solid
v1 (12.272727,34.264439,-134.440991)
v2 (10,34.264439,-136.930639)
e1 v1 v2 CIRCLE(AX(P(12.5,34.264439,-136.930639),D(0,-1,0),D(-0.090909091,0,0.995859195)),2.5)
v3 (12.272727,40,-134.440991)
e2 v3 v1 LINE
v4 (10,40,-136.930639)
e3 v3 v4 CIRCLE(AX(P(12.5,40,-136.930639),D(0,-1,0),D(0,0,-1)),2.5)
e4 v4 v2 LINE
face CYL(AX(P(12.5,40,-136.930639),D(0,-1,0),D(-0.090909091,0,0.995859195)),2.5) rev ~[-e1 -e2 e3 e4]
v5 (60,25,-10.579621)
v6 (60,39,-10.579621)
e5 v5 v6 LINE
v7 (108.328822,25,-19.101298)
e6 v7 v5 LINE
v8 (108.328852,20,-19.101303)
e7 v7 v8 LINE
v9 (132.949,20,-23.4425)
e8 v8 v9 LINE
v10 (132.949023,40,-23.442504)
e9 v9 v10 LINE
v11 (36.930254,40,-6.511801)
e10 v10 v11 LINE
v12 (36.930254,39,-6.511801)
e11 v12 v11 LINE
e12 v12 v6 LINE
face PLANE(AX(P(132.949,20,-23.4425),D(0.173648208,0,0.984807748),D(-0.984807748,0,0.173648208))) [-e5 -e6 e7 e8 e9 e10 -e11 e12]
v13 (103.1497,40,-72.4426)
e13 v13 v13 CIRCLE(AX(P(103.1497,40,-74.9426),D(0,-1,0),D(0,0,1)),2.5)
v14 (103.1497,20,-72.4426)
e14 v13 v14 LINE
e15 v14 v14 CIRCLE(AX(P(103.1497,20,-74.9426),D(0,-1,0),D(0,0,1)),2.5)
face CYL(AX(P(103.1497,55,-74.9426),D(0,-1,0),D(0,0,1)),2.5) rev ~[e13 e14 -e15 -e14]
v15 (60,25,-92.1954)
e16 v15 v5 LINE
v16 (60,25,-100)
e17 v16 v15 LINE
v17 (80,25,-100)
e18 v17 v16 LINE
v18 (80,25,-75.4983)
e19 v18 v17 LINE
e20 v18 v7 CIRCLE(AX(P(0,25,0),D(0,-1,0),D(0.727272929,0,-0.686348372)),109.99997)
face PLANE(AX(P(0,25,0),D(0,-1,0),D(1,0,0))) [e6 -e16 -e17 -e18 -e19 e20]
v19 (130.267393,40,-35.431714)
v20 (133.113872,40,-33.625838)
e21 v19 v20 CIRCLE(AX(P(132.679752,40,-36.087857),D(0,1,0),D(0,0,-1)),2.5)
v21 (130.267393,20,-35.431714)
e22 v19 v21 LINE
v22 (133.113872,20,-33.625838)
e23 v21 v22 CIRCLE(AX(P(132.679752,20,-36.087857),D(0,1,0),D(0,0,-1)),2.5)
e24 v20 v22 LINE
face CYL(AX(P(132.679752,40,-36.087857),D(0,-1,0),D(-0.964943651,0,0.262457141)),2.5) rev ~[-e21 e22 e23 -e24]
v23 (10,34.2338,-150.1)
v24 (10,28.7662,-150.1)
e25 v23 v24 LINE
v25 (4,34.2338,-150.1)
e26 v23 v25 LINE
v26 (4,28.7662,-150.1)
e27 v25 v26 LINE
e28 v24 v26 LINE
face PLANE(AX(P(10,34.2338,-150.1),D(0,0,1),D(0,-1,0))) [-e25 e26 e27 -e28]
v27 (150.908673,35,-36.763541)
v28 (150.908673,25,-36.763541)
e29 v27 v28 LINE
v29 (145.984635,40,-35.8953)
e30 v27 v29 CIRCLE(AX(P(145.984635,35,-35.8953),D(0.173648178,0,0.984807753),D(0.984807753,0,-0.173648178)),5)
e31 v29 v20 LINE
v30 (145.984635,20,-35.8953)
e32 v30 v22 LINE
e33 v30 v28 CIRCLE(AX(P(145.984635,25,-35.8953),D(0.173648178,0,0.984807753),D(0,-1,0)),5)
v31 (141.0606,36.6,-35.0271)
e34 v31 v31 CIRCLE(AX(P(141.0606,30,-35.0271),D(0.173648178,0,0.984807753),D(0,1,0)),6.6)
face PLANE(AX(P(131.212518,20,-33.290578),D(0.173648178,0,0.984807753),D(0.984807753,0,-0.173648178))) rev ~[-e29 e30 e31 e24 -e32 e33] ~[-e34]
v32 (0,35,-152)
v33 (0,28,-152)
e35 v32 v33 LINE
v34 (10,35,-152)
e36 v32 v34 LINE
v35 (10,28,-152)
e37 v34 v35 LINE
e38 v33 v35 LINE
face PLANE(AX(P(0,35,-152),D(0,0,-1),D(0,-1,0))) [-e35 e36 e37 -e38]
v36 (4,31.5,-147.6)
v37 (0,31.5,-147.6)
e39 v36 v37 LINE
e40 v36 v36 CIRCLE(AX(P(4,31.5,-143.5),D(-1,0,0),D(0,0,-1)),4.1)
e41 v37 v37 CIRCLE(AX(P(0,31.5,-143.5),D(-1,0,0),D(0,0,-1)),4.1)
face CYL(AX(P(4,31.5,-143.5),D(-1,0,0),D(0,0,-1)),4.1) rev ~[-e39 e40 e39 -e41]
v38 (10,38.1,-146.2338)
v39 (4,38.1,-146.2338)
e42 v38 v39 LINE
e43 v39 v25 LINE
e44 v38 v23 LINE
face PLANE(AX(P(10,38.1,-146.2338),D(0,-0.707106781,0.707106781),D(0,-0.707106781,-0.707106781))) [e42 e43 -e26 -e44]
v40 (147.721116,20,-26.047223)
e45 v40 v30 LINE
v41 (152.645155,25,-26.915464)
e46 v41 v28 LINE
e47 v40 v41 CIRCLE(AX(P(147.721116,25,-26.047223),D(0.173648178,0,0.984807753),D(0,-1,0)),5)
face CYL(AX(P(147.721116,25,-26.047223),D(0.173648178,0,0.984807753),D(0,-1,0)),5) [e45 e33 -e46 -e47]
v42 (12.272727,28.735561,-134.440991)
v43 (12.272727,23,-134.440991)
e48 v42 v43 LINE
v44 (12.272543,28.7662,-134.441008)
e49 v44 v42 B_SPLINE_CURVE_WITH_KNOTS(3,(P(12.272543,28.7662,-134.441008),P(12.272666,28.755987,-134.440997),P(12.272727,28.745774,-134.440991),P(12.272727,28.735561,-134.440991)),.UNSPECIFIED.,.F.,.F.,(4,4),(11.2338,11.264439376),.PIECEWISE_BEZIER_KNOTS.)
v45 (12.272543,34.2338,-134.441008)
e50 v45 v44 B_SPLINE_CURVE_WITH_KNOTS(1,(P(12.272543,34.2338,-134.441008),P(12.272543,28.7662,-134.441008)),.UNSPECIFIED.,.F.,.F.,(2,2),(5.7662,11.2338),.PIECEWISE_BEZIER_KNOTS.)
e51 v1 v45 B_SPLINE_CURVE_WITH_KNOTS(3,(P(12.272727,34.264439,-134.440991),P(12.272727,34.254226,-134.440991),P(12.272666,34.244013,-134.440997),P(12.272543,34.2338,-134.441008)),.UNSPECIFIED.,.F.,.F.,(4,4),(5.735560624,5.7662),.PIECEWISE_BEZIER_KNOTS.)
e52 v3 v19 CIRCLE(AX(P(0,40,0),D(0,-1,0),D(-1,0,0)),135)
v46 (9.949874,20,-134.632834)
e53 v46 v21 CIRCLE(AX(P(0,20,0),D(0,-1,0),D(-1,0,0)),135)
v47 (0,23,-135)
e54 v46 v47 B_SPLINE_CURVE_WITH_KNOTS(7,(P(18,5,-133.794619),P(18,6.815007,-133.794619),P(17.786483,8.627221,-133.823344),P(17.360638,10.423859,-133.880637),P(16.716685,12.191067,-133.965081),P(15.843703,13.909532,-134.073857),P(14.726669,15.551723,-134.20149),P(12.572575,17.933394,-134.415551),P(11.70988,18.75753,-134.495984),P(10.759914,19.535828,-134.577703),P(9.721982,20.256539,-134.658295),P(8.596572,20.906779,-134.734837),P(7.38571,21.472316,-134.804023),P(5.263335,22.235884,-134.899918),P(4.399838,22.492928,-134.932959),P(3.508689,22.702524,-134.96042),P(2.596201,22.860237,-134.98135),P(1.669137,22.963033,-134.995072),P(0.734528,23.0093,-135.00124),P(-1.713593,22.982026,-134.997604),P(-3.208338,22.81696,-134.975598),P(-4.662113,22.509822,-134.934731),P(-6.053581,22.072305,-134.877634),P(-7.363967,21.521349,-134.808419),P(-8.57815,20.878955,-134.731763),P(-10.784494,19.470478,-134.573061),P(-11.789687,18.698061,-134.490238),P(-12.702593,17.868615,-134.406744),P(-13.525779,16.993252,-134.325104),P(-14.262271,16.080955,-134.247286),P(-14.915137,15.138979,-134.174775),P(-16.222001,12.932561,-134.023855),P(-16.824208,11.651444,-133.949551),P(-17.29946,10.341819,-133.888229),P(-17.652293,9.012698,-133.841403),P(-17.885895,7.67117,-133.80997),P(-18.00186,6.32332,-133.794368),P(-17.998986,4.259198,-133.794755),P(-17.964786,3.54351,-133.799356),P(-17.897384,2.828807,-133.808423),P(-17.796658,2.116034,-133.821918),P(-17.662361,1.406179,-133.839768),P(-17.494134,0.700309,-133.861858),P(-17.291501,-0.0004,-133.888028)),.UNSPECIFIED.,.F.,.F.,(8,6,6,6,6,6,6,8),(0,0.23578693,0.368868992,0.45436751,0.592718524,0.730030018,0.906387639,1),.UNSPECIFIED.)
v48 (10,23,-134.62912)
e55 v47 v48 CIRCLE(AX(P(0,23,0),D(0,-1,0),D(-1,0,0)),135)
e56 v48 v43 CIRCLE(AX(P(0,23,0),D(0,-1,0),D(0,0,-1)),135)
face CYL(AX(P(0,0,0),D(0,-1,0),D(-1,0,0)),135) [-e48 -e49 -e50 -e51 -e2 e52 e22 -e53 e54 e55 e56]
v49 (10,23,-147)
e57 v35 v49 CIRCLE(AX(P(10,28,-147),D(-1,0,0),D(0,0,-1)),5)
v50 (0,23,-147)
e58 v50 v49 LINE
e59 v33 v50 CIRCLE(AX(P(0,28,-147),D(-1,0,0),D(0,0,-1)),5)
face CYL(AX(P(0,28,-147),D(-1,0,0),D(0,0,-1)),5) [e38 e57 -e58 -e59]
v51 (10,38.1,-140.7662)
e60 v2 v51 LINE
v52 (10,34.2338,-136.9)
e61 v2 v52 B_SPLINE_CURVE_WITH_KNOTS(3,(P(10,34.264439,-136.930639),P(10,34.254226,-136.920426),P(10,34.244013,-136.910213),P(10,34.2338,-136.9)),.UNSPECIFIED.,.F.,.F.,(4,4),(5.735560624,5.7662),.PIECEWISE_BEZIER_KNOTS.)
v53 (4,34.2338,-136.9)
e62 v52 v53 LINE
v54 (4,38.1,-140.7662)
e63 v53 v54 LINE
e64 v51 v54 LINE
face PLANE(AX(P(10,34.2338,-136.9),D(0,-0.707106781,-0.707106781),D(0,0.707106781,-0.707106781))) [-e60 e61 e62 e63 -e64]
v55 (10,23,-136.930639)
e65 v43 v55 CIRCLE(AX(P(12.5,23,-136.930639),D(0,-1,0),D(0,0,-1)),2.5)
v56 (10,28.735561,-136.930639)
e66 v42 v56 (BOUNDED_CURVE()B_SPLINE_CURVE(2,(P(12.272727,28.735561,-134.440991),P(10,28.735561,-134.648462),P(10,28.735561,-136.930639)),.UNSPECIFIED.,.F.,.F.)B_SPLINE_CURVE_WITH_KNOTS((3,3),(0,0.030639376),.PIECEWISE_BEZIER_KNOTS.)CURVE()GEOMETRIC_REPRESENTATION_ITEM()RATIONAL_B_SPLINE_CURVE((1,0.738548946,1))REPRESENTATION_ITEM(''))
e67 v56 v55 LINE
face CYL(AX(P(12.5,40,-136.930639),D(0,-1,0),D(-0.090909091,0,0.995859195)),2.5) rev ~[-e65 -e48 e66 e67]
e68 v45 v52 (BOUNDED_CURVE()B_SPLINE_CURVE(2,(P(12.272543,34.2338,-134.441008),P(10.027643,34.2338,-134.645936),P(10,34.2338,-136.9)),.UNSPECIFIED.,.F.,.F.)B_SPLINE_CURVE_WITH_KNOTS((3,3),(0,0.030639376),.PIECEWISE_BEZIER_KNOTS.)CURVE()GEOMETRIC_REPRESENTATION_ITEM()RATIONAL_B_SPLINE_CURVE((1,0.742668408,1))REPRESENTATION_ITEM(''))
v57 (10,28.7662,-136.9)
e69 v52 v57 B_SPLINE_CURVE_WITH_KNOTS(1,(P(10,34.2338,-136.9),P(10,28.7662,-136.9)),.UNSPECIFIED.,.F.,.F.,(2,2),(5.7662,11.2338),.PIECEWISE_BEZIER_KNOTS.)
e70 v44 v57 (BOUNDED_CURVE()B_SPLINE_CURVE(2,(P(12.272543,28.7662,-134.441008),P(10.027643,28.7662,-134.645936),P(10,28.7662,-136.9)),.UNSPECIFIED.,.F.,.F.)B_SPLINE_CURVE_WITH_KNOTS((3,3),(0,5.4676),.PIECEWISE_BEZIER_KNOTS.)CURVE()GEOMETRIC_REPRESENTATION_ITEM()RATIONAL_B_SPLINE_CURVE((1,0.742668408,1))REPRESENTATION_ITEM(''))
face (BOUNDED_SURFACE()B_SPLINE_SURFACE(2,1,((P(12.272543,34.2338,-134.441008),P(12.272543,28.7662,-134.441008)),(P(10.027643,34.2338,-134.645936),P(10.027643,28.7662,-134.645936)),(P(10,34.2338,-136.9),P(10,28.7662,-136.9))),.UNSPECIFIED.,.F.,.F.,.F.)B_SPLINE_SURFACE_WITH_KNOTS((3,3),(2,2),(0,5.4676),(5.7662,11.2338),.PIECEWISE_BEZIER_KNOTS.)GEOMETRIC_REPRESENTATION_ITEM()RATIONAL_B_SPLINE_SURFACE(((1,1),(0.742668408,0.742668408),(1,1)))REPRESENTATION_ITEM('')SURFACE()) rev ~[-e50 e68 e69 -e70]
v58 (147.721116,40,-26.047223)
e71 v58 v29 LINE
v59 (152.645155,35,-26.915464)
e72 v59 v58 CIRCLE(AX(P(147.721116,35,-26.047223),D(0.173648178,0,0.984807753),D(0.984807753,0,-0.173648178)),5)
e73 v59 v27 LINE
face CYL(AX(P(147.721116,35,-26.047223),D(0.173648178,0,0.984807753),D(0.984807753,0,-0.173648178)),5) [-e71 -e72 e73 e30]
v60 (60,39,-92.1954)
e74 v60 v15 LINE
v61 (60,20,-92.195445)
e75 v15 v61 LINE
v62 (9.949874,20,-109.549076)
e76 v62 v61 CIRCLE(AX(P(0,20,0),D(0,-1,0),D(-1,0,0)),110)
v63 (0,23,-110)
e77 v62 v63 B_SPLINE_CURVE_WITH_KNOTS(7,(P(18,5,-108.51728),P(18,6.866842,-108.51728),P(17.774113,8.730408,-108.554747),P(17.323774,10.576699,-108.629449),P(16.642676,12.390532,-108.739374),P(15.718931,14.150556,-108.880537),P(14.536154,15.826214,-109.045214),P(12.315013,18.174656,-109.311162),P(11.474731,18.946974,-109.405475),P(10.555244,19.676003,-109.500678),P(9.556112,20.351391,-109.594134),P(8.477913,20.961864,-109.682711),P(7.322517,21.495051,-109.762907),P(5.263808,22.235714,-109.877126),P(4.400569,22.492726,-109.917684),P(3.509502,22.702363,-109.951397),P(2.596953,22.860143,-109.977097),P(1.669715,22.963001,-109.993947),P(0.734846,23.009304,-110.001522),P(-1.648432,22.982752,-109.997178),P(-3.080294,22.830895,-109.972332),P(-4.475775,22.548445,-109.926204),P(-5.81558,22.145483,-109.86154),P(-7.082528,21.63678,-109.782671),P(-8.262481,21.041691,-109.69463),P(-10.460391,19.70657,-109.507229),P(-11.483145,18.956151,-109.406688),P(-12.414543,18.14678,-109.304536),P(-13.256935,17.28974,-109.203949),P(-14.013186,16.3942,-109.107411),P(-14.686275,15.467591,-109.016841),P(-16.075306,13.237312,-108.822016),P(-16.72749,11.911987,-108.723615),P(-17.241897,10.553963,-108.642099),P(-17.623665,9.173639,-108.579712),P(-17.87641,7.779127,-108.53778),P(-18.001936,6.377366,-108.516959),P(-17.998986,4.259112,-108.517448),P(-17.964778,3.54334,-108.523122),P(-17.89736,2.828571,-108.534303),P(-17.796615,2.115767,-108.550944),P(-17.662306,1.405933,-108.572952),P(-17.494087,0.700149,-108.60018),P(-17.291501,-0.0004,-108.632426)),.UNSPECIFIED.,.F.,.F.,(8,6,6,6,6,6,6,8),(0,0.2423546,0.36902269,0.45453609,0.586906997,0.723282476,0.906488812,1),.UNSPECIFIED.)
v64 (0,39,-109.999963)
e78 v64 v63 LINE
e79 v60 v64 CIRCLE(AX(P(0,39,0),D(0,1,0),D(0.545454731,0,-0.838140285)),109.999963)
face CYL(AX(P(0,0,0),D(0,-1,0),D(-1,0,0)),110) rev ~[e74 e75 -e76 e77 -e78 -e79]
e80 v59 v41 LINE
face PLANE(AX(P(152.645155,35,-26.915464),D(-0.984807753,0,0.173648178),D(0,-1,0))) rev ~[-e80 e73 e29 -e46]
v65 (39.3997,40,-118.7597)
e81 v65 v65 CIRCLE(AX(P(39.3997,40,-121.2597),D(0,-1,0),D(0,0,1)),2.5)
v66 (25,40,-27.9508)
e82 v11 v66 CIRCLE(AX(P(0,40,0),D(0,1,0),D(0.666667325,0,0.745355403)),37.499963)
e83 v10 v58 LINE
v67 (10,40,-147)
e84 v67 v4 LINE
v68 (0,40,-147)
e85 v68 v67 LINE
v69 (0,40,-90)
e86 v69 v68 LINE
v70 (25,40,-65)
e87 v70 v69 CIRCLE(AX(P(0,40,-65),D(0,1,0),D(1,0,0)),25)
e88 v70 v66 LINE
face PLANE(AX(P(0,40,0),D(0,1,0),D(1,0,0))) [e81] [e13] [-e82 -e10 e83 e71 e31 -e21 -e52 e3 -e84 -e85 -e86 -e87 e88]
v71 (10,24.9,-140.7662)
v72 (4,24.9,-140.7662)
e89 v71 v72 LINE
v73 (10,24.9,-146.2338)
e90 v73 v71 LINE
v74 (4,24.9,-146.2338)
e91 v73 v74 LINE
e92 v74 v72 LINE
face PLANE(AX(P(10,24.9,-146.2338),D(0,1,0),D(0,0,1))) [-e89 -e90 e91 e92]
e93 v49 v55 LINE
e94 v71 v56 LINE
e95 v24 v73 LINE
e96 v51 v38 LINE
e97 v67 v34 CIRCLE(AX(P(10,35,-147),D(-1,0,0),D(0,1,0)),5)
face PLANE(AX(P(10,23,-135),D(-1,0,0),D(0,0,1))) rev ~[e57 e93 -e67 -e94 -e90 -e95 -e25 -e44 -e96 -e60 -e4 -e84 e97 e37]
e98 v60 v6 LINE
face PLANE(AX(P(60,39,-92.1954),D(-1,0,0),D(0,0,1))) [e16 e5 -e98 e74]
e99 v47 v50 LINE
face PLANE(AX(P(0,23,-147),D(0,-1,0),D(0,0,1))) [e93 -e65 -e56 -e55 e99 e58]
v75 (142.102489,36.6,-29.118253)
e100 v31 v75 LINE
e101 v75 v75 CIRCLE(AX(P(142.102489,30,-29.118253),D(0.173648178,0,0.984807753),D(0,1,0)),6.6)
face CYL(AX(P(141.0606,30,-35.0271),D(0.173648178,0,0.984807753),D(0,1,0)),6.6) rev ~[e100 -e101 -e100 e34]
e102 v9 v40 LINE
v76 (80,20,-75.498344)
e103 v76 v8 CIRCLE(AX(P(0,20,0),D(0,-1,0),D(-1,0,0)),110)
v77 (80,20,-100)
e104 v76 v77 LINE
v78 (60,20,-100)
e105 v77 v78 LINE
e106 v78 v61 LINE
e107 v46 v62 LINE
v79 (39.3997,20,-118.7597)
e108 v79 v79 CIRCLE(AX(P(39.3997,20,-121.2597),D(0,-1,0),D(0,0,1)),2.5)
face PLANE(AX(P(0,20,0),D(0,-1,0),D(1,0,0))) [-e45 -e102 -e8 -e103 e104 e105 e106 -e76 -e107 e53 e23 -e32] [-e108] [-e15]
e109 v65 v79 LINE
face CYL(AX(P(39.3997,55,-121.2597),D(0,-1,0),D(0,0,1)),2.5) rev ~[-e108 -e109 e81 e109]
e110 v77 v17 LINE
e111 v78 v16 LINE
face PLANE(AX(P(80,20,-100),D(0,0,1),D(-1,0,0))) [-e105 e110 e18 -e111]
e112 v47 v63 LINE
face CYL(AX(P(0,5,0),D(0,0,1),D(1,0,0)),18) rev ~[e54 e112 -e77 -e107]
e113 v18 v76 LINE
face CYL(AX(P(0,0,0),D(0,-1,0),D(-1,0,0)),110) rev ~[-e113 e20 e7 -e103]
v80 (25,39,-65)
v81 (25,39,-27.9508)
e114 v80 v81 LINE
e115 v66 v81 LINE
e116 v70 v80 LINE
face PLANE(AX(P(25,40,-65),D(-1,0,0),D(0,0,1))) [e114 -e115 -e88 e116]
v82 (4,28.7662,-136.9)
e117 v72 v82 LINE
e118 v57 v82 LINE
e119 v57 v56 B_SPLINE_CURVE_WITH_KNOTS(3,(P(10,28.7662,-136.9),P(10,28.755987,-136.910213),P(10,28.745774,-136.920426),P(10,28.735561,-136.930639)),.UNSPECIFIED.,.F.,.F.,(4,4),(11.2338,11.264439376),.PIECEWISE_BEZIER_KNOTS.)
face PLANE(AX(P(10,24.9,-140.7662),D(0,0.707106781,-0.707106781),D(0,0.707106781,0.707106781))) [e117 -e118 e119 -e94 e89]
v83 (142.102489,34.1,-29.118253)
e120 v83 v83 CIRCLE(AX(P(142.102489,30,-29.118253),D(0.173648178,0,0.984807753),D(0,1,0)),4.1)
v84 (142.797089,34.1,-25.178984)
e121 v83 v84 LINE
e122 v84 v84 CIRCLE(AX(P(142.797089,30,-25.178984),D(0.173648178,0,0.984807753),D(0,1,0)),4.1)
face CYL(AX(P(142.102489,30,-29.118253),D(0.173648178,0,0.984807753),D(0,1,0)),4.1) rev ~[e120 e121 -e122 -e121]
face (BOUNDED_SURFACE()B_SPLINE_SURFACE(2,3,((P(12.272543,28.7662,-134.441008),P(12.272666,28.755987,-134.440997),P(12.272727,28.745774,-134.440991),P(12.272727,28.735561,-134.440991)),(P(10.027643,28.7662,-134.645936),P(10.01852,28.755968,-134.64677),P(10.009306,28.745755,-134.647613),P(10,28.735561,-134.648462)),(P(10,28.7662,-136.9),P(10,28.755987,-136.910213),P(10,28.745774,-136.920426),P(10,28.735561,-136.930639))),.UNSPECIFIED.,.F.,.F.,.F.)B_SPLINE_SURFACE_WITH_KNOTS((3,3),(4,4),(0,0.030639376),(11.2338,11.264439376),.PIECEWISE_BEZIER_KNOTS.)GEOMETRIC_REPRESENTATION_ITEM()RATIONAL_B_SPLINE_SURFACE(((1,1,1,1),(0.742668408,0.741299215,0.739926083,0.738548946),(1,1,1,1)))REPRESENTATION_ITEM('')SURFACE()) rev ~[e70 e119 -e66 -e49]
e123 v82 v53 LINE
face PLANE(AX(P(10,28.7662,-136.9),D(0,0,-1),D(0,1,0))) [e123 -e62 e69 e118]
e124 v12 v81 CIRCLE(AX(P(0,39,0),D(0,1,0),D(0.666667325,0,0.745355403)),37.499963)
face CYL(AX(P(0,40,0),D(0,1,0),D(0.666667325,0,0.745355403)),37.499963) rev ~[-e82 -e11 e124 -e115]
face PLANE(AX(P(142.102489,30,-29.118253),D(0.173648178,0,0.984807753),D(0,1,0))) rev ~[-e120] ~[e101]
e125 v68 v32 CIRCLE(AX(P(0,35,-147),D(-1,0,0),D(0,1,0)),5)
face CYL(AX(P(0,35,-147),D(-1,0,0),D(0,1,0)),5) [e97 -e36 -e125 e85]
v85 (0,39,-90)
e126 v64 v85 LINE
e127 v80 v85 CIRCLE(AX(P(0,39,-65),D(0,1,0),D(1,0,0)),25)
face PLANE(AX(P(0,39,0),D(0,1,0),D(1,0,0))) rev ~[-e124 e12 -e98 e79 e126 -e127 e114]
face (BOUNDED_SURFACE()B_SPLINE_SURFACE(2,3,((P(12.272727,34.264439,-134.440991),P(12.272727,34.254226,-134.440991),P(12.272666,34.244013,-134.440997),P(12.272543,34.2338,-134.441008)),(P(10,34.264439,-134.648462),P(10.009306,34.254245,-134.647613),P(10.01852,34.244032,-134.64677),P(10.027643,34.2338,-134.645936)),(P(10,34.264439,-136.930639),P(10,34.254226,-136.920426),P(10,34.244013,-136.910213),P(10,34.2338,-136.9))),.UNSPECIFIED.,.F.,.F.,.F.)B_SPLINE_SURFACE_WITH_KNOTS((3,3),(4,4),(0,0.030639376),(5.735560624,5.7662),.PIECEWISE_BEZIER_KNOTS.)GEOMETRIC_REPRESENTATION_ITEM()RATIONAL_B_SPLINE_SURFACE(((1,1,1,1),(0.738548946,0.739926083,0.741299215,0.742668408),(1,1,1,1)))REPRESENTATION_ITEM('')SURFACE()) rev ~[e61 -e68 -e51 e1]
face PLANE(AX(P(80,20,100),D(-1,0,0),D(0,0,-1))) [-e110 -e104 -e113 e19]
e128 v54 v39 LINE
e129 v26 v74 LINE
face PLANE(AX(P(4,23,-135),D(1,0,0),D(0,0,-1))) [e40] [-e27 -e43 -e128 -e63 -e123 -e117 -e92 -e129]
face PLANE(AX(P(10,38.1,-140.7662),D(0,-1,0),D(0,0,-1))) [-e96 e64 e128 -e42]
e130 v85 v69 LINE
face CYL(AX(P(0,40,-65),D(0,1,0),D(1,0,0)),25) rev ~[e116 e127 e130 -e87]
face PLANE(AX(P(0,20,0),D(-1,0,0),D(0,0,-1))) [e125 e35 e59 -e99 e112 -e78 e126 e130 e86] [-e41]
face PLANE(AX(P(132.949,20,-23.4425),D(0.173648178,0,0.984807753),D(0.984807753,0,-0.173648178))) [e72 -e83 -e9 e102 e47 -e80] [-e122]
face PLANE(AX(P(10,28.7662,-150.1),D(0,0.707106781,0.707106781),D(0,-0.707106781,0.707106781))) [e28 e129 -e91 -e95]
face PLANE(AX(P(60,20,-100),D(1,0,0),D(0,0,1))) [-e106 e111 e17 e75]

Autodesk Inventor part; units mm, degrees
ref_plane "YZ Plane" through (0, 0, 0) normal (1, 0, 0) x (0, 1, 0)
ref_plane "XZ Plane" through (0, 0, 0) normal (0, 1, 0) x (-1, 0, 0)
ref_plane "XY Plane" through (0, 0, 0) normal (0, 0, 1) x (1, 0, 0)
sketch "Sketch1" plane through (0, 0, 0) normal (0, 1, 0) x (-1, 0, 0)
  circle A0 centre (0, 0) radius 135
  circle A1 centre (0, 0) radius 110
  dimension "d0" = 270
  dimension "d1" = 220
extrude "Extrusion1" add sketch "Sketch1" along normal blind 55
sketch "Sketch2" plane through (0, 0, 0) normal (0, 0, 1) x (1, 0, 0)
  circle A0 centre (0, 5) radius 18
  line L0 (135, 0) -> (-135, 0) projected
  point P0 (0, 0)
  dimension "d4" = 36
  dimension "d5" = 5
extrude "Extrusion2" cut sketch "Sketch2" against normal through all
sketch "Sketch3" plane through (0, 0, 0) normal (0, -1, 0) x (1, 0, 0)
  circle A0 centre (0, 0) radius 140
extrude "Extrusion3" cut sketch "Sketch3" against normal blind 20
sketch "Sketch4" plane through (0, 20, 0) normal (0, -1, 0) x (1, 0, 0)
  line L0 (0, 0) -> (70, 0)
  line L1 (80, -100) -> (60, -100)
  line L2 (60, -100) -> (60, 100)
  line L3 (60, 100) -> (80, 100)
  line L4 (80, 100) -> (80, -100)
  line L5 (80, -100) -> (60, 100) construction
  line L6 (60, -100) -> (80, 100) construction
  dimension "d10" = 70
  dimension "d11" = 20
  dimension "d12" = 200
extrude "Extrusion4" cut sketch "Sketch4" against normal through all
sketch "Sketch5" plane through (0, 55, 0) normal (0, 1, 0) x (1, 0, 0)
  circle A0 centre (0, 0) radius 127.5
  circle A1 centre (127.5, 0) radius 2
  circle A2 centre (103.1497, 74.9426) radius 2
  circle A3 centre (39.3997, 121.2597) radius 2
  circle A4 centre (-39.3997, 121.2597) radius 2
  circle A5 centre (-103.1497, 74.9426) radius 2
  circle A6 centre (-127.5, 0) radius 2
  circle A7 centre (-103.1497, -74.9426) radius 2
  circle A8 centre (-39.3997, -121.2597) radius 2
  circle A9 centre (39.3997, -121.2597) radius 2
  circle A10 centre (103.1497, -74.9426) radius 2
  dimension "d15" = 255
  dimension "d16" = 4
  dimension "d19" = 360
hole "Hole1" at (127.5, 55, 0) at (103.1497, 55, 74.9426) at (39.3997, 55, 121.2597) at (-39.3997, 55, 121.2597) at (-103.1497, 55, 74.9426) at (-127.5, 55, 0) at (-103.1497, 55, -74.9426) at (-39.3997, 55, -121.2597) at (39.3997, 55, -121.2597) at (103.1497, 55, -74.9426) direction (0, -1, 0) diameter 5 end through all
sketch "Sketch6" plane through (0, 55, 0) normal (0, 1, 0) x (1, 0, 0)
  circle A0 centre (0, 0) radius 140
extrude "Extrusion5" cut sketch "Sketch6" against normal blind 15
sketch "Sketch7" plane through (0, 40, 0) normal (0, 1, 0) x (1, 0, 0)
  circle A0 centre (0, 0) radius 140
  line L0 (80, -100) -> (80, -75.4983) projected
  line L1 (80, -100) -> (80, -75.4983)
  line L2 (60, -100) -> (80, -100) projected
  line L3 (80, -100) -> (60, -100)
  line L4 (60, -100) -> (60, -92.1954)
  line L5 (60, 100) -> (60, 92.1954) projected
  line L6 (60, 92.1954) -> (60, 100)
  line L7 (60, 100) -> (80, 100)
  line L8 (80, 100) -> (80, 75.4983)
  arc A1 (80, -75.4983) -> (80, 75.4983) centre (0, 0) ccw
  arc A2 (60, 92.1954) -> (60, -92.1954) centre (0, 0) ccw
  arc A3 (-25, -65) -> (25, -65) centre (0, -65) ccw
  arc A4 (25, 65) -> (-25, 65) centre (0, 65) ccw
  arc A5 (25, -27.9508) -> (25, 27.9508) centre (0, 0) ccw
  arc A6 (-25, 27.9508) -> (-25, -27.9508) centre (0, 0) ccw
  line L9 (25, 65) -> (25, 27.9508)
  line L10 (25, -27.9508) -> (25, -65)
  line L11 (-25, -65) -> (-25, -27.9508)
  line L12 (-25, 27.9508) -> (-25, 65)
extrude "Extrusion6" add sketch "Sketch7" against normal blind 1 contours L2 L4 A2 L5 L7 L8 A1 L0
sketch "Sketch8" plane through (0, 39, 0) normal (0, -1, 0) x (1, 0, 0)
  line L0 (80, -75.4983) -> (80, -100) projected
  line L1 (80, -100) -> (60, -100)
  line L2 (60, -100) -> (60, 100)
  line L3 (60, 100) -> (80, 100)
  line L4 (80, 100) -> (80, 75.4983)
  line L5 (80, -75.4983) -> (80, -100)
  arc A0 (80, -75.4983) -> (80, 75.4983) centre (0, 0) ccw
  arc A1 (60, 92.1954) -> (60, -92.1954) centre (0, 0) ccw
extrude "Extrusion7" add sketch "Sketch8" along normal blind 14 contours L0 L1 L2 L3 L4 A0
sketch "Sketch9" plane through (0, 20, 0) normal (0, -1, 0) x (1, 0, 0)
  arc A0 (9.9499, -134.6328) -> (-9.9499, -134.6328) centre (0, 0) ccw projected
  spline S0 degree 7 poles (9.9499, -134.6328) (9.4556, -134.6694) (8.9421, -134.7052) (8.4096, -134.74) (7.8582, -134.7735) (7.2882, -134.8052) (6.6998, -134.835) (5.2633, -134.8999) (4.3998, -134.933) (3.5087, -134.9604) (2.5962, -134.9814) (1.6691, -134.9951) (0.7345, -135.0012) (-1.7136, -134.9976) (-3.2083, -134.9756) (-4.6621, -134.9347) (-6.0536, -134.8776) (-7.364, -134.8084) (-8.5782, -134.7318) (-9.7236, -134.6494) (-9.7616, -134.6466) (-9.7995, -134.6439) (-9.8372, -134.6411) (-9.8749, -134.6384) (-9.9124, -134.6356) (-9.9499, -134.6328) knots 0 0 0 0 0 0 0 0 0.214533 0.214533 0.214533 0.214533 0.214533 0.214533 0.508291 0.508291 0.508291 0.508291 0.508291 0.508291 0.983641 0.983641 0.983641 0.983641 0.983641 0.983641 1 1 1 1 1 1 1 1 projected
  line L0 (0, 135) -> (0, -135)
  line L1 (132.949, -23.4425) -> (-132.949, 23.4425)
  point P0 (0, 0)
  dimension "d40" = 80
extrude "Extrusion8" cut sketch "Sketch9" against normal through all contours L1 L0 A0 | S0 A0 L1 L0 | L0 L1 A0 picked at (-11.9552, -89.0406)
sketch "Sketch10" plane through (0, 23, -135) normal (-1, 0, 0) x (0, 0, 1)
  line L0 (0, 17) -> (111.5575, 17) projected
  line L1 (2.5, 17) -> (-12, 17)
  line L2 (-17, 12) -> (-17, 5)
  line L3 (-12, 0) -> (2.5, 0)
  line L4 (2.5, 0) -> (2.5, 17)
  line L5 (0, 0) -> (0, 17) projected
  arc A0 (-17, 5) -> (-12, 0) centre (-12, 5) ccw
  arc A1 (-12, 17) -> (-17, 12) centre (-12, 12) ccw
  point P0 (135, -23)
  point P1 (-17, 0)
  point P2 (-17, 17)
  dimension "d43" = 19.5
  dimension "d44" = 17
  dimension "d45" = 17
  dimension "d46" = 5
extrude "Extrusion9" add sketch "Sketch10" against normal blind 10
sketch "Sketch11" plane through (10, 23, -135) normal (1, 0, 0) x (0, 0, -1)
  line L0 (15.1, 5.7662) -> (11.2338, 1.9)
  line L1 (11.2338, 1.9) -> (5.7662, 1.9)
  line L2 (5.7662, 1.9) -> (1.9, 5.7662)
  line L3 (1.9, 5.7662) -> (1.9, 11.2338)
  line L4 (1.9, 11.2338) -> (5.7662, 15.1)
  line L5 (5.7662, 15.1) -> (11.2338, 15.1)
  line L6 (11.2338, 15.1) -> (15.1, 11.2338)
  line L7 (15.1, 11.2338) -> (15.1, 5.7662)
  line L8 (17, 5) -> (17, 12) projected
  line L9 (-0.3709, 0) -> (12, 0) projected
  point P0 (-135, -23)
  point P1 (8.5, 8.5)
  point P2 (1.9306, 0)
  dimension "d50" = 8.5
  dimension "d51" = 8.5
  dimension "d52" = 13.2
extrude "Extrusion10" cut sketch "Sketch11" against normal blind 6
sketch "Sketch12" plane through (4, 23, -135) normal (1, 0, 0) x (0, 0, -1)
  line L0 (-0.3709, 0) -> (12, 0) projected
  line L1 (17, 5) -> (17, 12) projected
  point P0 (-135, -23)
  point P1 (8.5, 8.5)
  point P2 (1.9306, 0)
  dimension "d55" = 8.5
  dimension "d56" = 8.5
hole "Hole2" at (4, 31.5, -143.5) direction (-1, 0, 0) diameter 8.2 end through all
sketch "Sketch13" plane through (132.949, 20, -23.4425) normal (0.1736482, 0, 0.9848078) x (0.9848078, 0, -0.1736482)
  line L0 (-97.5, 20) -> (0, 20) projected
  line L1 (-2.5, 20) -> (15, 20)
  line L2 (20, 15) -> (20, 5)
  line L3 (15, 0) -> (-2.5, 0)
  line L4 (-2.5, 0) -> (-2.5, 20)
  line L5 (0, 20) -> (0, 0) projected
  arc A0 (20, 15) -> (15, 20) centre (15, 15) ccw
  arc A1 (15, 0) -> (20, 5) centre (15, 5) ccw
  point P0 (-135, -20)
  point P1 (20, 0)
  point P2 (20, 20)
  dimension "d64" = 22.5
  dimension "d65" = 20
  dimension "d66" = 20
  dimension "d67" = 5
extrude "Extrusion11" add sketch "Sketch13" against normal blind 10
sketch "Sketch14" plane through (131.2126, 20, -33.2906) normal (-0.1736482, 0, -0.9848078) x (-0.9848078, 0, 0.1736482)
  line L0 (0.3709, 20) -> (-15, 20) projected
  line L1 (-20, 15) -> (-20, 5) projected
  point P0 (135, -20)
  point P1 (-10, 10)
  dimension "d70" = 10
  dimension "d71" = 10
hole "Hole3" at (141.0606, 30, -35.0271) direction (0.1736482, 0, 0.9848078) diameter 8.2 end through all counterbore diameter 13.2 counterbore depth 6
fillet "Fillet2" radius 2.5 2 edges at (130.8473, 30, -33.2262) (10, 31.5, -134.6291)
properties part number "Cylinder Spacer Top_Q2"
